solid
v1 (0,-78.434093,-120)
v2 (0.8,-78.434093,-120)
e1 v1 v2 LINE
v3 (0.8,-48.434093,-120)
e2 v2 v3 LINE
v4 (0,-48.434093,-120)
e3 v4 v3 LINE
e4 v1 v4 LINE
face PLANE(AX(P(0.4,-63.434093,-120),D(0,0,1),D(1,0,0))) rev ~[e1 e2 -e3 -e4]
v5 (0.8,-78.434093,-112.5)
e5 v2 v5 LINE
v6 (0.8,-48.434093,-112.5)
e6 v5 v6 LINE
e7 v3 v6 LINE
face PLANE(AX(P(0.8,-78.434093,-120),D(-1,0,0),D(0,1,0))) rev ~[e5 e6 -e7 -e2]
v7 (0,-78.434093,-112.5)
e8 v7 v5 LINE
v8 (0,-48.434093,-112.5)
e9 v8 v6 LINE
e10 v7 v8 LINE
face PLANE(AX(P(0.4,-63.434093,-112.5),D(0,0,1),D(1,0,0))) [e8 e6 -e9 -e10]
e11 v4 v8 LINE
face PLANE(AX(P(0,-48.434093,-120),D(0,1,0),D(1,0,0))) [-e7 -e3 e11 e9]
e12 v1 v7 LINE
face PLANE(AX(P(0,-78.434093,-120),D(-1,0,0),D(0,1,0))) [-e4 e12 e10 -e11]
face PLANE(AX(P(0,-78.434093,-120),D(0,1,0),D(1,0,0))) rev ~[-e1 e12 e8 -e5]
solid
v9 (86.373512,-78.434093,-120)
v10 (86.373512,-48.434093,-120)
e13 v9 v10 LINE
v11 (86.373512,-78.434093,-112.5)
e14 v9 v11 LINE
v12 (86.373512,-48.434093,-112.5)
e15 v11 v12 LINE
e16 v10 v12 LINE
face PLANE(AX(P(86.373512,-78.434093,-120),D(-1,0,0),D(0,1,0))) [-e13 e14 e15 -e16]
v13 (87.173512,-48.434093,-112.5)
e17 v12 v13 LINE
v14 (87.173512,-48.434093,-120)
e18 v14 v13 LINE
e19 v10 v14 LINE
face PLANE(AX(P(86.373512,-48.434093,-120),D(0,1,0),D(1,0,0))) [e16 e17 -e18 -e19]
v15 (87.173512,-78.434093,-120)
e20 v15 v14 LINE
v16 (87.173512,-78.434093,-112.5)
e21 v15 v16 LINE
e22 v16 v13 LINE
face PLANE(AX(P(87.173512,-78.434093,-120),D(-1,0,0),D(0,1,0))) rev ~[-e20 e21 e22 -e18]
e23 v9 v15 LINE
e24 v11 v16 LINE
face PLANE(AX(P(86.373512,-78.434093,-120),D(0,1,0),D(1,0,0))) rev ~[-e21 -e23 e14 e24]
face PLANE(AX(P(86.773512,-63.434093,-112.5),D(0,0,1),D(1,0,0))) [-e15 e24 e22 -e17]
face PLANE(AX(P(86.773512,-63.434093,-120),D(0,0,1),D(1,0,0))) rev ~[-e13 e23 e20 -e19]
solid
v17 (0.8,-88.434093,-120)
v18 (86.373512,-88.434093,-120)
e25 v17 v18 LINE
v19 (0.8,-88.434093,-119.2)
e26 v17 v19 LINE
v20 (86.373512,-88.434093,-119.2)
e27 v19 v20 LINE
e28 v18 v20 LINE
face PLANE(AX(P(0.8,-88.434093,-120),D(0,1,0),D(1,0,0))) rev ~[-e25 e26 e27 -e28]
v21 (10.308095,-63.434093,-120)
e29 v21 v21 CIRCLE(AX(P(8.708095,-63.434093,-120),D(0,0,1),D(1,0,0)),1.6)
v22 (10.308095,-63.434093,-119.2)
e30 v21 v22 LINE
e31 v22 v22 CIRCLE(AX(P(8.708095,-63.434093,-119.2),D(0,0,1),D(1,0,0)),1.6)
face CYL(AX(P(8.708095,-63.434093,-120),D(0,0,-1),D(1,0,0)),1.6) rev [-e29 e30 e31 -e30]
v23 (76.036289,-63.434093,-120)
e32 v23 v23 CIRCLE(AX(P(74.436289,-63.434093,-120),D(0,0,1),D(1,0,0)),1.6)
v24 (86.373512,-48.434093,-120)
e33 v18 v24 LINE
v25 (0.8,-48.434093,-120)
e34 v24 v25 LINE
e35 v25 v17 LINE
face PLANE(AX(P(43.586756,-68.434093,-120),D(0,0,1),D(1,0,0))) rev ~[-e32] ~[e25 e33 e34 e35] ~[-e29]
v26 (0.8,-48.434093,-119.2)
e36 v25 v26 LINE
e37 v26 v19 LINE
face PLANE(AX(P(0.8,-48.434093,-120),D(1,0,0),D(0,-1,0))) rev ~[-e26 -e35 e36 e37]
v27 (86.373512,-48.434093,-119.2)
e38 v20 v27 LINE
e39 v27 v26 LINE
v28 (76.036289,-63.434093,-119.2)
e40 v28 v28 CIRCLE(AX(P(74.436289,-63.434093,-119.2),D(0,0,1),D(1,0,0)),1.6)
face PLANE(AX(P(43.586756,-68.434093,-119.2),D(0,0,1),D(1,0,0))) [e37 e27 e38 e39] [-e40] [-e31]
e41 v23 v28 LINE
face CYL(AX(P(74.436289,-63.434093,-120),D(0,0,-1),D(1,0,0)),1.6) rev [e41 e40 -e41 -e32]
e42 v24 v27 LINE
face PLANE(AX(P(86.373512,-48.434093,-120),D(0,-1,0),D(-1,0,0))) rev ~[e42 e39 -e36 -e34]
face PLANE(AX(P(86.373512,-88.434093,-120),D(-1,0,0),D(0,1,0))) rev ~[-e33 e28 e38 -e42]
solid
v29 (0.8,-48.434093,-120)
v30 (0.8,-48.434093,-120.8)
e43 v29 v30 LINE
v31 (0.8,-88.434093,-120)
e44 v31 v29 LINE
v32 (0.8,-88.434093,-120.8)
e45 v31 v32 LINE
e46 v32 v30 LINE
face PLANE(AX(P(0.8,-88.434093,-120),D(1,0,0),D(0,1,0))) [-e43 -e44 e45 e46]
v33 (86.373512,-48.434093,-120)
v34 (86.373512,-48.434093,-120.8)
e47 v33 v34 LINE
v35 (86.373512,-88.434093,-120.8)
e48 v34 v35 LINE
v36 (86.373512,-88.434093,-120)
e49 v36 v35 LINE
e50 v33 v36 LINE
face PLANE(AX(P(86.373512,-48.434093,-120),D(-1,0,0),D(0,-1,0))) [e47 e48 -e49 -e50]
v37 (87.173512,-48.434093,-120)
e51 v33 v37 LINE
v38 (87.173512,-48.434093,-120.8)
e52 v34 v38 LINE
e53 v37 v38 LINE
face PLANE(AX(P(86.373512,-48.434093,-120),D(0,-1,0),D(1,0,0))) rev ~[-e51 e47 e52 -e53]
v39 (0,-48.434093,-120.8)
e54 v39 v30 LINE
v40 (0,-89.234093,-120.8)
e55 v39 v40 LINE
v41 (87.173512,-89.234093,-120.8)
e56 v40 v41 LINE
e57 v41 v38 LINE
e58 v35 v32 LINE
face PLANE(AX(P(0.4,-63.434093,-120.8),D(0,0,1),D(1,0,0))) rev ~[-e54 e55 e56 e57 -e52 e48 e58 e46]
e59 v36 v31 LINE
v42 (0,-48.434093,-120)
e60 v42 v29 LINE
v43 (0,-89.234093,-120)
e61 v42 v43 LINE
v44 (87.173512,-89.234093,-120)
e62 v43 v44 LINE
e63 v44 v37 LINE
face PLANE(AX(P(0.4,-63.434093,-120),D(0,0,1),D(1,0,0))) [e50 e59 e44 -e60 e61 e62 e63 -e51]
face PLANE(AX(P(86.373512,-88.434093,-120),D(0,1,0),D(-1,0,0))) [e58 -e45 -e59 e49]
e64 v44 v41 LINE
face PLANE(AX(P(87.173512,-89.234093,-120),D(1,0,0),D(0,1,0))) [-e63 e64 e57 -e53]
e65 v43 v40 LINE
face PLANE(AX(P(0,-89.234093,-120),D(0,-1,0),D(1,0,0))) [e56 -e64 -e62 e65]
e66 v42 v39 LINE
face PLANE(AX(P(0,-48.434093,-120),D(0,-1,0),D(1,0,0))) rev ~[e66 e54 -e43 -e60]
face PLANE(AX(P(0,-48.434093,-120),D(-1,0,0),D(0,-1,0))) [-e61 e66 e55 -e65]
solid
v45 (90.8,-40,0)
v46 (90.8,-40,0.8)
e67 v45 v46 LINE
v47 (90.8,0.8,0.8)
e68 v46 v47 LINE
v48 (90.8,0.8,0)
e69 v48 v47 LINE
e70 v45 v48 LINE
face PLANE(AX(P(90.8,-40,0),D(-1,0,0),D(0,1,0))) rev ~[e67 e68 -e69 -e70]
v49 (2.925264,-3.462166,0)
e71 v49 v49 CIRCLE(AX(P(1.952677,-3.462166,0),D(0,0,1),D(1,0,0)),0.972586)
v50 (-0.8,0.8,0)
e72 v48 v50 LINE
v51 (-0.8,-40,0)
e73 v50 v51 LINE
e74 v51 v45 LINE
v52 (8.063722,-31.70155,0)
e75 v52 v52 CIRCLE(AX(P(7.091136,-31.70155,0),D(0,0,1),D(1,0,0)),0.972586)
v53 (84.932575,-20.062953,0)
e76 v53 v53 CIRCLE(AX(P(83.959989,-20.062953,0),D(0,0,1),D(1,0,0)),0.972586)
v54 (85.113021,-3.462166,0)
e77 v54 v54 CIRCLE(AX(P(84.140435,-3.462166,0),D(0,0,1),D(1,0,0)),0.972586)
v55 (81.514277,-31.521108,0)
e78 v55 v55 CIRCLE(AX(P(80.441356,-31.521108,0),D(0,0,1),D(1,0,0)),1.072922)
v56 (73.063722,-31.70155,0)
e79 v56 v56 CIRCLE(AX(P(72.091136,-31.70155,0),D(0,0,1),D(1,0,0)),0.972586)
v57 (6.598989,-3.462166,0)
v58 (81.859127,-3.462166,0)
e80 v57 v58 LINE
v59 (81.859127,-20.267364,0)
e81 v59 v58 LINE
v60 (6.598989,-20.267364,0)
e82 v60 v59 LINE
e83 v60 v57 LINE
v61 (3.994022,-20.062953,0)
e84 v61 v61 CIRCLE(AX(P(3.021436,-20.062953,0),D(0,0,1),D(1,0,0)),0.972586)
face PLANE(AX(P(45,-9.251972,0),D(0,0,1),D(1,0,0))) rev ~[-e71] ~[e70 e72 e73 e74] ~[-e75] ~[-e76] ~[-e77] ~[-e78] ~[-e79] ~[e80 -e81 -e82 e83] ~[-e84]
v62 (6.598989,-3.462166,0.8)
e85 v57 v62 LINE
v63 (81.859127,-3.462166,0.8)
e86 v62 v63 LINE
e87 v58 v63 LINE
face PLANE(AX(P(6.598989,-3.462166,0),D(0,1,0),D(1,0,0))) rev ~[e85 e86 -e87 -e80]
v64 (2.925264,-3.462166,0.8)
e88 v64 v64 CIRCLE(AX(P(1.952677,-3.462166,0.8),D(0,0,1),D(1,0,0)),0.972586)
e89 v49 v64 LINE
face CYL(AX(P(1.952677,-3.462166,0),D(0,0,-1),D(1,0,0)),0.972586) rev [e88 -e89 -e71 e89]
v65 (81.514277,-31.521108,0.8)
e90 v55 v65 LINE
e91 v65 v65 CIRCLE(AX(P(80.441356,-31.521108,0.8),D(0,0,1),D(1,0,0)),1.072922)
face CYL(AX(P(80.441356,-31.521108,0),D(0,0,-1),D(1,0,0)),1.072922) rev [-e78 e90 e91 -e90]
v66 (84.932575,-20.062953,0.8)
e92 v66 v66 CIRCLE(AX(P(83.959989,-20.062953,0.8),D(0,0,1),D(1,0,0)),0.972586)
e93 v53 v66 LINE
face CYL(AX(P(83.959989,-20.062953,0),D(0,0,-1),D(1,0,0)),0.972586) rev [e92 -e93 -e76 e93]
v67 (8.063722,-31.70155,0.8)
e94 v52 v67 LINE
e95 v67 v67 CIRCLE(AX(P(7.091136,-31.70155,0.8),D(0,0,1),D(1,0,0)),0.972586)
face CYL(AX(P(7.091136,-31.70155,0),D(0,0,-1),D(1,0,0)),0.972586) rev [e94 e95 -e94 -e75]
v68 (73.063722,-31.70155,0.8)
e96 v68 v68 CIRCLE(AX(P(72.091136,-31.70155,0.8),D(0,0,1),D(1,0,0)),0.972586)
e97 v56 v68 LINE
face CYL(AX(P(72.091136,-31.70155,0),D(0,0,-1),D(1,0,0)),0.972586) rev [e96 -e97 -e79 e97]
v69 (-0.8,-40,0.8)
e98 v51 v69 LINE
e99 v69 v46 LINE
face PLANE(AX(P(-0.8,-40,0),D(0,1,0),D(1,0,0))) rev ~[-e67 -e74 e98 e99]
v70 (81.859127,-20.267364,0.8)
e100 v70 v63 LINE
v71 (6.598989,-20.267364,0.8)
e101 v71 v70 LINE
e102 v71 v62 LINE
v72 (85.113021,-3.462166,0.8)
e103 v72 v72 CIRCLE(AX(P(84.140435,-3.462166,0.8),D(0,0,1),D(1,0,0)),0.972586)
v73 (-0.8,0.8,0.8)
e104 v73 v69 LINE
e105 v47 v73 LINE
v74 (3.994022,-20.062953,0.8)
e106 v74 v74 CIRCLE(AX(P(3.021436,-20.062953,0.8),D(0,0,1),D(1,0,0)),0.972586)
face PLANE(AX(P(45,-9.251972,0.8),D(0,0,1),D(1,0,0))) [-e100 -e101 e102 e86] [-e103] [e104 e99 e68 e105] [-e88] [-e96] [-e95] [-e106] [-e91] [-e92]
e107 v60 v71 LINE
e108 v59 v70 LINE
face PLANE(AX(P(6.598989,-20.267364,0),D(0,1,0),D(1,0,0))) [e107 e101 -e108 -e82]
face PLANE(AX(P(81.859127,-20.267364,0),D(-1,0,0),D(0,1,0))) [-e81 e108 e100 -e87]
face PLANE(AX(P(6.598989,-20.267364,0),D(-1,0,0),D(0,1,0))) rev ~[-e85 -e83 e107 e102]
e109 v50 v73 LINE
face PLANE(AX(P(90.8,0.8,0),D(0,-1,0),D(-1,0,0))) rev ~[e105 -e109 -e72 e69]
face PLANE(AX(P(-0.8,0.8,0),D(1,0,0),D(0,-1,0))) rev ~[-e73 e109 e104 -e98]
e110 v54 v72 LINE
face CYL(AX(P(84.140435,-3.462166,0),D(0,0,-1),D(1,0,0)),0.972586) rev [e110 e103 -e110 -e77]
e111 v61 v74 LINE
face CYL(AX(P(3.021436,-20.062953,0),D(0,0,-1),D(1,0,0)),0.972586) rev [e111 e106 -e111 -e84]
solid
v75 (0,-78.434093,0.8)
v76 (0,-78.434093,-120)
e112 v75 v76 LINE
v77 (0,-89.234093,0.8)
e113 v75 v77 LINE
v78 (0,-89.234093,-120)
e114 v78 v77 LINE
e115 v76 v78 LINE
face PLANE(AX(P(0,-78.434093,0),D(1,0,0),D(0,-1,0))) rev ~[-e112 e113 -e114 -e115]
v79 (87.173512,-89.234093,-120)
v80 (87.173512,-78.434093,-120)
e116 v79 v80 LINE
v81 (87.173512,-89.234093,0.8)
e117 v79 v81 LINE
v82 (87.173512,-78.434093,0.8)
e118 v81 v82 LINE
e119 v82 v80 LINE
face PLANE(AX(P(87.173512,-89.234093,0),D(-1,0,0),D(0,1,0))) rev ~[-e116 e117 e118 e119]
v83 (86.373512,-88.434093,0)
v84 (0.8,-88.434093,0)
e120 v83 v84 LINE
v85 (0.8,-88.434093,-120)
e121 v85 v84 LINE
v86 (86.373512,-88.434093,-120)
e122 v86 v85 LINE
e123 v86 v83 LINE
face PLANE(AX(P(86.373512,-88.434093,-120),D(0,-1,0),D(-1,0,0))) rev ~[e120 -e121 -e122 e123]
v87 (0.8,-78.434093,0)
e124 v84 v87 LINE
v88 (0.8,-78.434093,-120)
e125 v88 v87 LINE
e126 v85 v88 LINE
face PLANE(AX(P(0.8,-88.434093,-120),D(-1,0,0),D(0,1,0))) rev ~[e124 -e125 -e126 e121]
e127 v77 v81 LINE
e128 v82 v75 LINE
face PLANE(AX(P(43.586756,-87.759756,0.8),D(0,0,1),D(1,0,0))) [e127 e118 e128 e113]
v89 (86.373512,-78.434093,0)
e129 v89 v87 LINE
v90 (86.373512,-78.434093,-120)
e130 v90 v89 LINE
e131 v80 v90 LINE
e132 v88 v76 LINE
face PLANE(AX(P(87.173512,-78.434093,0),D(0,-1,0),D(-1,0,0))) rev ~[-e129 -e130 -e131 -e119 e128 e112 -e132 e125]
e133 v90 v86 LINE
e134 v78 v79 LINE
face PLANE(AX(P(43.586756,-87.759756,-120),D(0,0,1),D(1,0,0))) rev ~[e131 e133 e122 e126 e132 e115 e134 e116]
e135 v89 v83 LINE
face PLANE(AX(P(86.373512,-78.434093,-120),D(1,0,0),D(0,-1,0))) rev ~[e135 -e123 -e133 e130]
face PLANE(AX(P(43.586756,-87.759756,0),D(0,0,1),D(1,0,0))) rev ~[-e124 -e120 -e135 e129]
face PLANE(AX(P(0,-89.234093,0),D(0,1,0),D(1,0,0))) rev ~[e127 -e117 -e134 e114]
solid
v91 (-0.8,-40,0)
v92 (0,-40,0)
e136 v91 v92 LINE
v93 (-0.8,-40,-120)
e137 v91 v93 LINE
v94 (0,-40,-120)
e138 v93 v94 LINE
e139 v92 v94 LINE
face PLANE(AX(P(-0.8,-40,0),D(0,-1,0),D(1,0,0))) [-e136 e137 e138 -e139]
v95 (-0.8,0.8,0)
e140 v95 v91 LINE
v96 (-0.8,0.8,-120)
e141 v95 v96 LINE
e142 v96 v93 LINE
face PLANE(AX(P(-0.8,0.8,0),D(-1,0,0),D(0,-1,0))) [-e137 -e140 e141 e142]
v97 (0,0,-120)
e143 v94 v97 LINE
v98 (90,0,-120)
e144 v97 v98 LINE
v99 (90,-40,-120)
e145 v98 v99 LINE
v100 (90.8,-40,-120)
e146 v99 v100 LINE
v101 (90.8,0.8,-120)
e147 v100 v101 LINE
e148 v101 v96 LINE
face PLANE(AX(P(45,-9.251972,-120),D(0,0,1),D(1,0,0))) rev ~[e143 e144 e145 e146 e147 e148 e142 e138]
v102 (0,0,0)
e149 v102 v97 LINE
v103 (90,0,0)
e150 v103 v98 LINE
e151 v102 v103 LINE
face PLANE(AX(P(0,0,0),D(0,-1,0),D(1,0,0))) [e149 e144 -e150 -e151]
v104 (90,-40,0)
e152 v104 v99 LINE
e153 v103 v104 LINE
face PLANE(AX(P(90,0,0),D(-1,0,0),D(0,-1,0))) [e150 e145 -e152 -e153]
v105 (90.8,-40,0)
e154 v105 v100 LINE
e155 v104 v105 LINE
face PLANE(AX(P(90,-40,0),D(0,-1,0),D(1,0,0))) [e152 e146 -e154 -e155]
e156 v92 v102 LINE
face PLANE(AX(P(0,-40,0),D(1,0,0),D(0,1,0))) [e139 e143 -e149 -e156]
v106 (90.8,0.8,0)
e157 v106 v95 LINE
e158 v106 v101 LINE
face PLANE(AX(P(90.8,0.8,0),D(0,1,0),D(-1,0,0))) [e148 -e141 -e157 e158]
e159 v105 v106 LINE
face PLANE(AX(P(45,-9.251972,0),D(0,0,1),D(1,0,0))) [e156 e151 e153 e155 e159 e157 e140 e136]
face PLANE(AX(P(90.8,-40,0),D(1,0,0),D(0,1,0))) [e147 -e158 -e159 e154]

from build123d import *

# Parameters (mm, degrees)
F1_DEPTH  = 120
F0_W      = 90
F0_H      = 40
F0_R      = 0.9725861443
F0_R_2    = 1.0729216039
F0_W_2    = 75.2601372078
F0_H_2    = 16.8051975779
F2_DEPTH  = 0.8
F4_W      = 0.8
F4_H      = 30
F5_DEPTH  = 0.8
F6_DEPTH  = 120
F7_DEPTH  = 7.5
F8_W      = 85.5735123101
F8_H      = 10
F9_DEPTH  = 0.8
F4_R      = 1.6
F10_DEPTH = 0.8


with BuildPart() as f1:
    # F0 (on Top) → F1 (new body)
    with BuildSketch(Plane.XY):
        Polygon((0, -40), (0, 0), (90, 0), (90, -40), (90.8, -40), (90.8, 0.8), (-0.8, 0.8), (-0.8, -40), align=None)
    extrude(amount=-F1_DEPTH)


with BuildPart() as f2:
    # F0 (on Top) → F2 (new body)
    with BuildSketch(Plane.XY):
        Polygon((0, -40), (0, 0), (90, 0), (90, -40), (90.8, -40), (90.8, 0.8), (-0.8, 0.8), (-0.8, -40), align=None)
        with Locations((45, -20)):
            Rectangle(F0_W, F0_H)
        with Locations((7.0911361836, -31.7015498877)):
            Circle(F0_R, mode=Mode.SUBTRACT)
        with Locations((3.0214360449, -20.0629532337)):
            Circle(F0_R, mode=Mode.SUBTRACT)
        with Locations((72.0911361836, -31.7015498877)):
            Circle(F0_R, mode=Mode.SUBTRACT)
        with Locations((80.4413557053, -31.5211080015)):
            Circle(F0_R_2, mode=Mode.SUBTRACT)
        with Locations((83.9599892497, -20.0629532337)):
            Circle(F0_R, mode=Mode.SUBTRACT)
        with Locations((44.2290580831, -11.8647648487)):
            Rectangle(F0_W_2, F0_H_2, mode=Mode.SUBTRACT)
        with Locations((1.9526774995, -3.4621660598)):
            Circle(F0_R, mode=Mode.SUBTRACT)
        with Locations((84.1404348612, -3.4621660598)):
            Circle(F0_R, mode=Mode.SUBTRACT)
    extrude(amount=F2_DEPTH)


with BuildPart() as f5:
    # F4 (on offset) → F5 (new body)
    with BuildSketch(Plane.XY.offset(-120)):
        with Locations((0.4, -63.4340933131)):
            Rectangle(F4_W, F4_H)
        Polygon((0.8, -78.4340933131), (0, -78.4340933131), (0, -89.2340933131), (87.1735123101, -89.2340933131), (87.1735123101, -78.4340933131), (86.3735123101, -78.4340933131), (86.3735123101, -88.4340933131), (0.8, -88.4340933131), align=None)
        with Locations((86.7735123101, -63.4340933131)):
            Rectangle(F4_W, F4_H)
    extrude(amount=-F5_DEPTH)


with BuildPart() as f6:
    # F4 (on offset) → F6 (new body)
    with BuildSketch(Plane.XY.offset(-120)):
        Polygon((0.8, -78.4340933131), (0, -78.4340933131), (0, -89.2340933131), (87.1735123101, -89.2340933131), (87.1735123101, -78.4340933131), (86.3735123101, -78.4340933131), (86.3735123101, -88.4340933131), (0.8, -88.4340933131), align=None)
    extrude(amount=F6_DEPTH)

    # F8 (on face) → F9 (join)
    with BuildSketch(Plane.XY):
        Polygon((0, -78.4340933131), (0, -89.2340933131), (87.1735123101, -89.2340933131), (87.1735123101, -78.4340933131), (86.3735123101, -78.4340933131), (86.3735123101, -88.4340933131), (0.8, -88.4340933131), (0.8, -78.4340933131), align=None)
        with Locations((43.586756155, -83.4340933131)):
            Rectangle(F8_W, F8_H)
    extrude(amount=F9_DEPTH)


with BuildPart() as f7:
    # F4 (on offset) → F7 (new body)
    with BuildSketch(Plane.XY.offset(-120)):
        with Locations((86.7735123101, -63.4340933131)):
            Rectangle(F4_W, F4_H)
    extrude(amount=F7_DEPTH)


with BuildPart() as f7b:
    # F4 (on offset) → F7, piece 2 (new body)
    with BuildSketch(Plane.XY.offset(-120)):
        with Locations((0.4, -63.4340933131)):
            Rectangle(F4_W, F4_H)
    extrude(amount=F7_DEPTH)


with BuildPart() as f10:
    # F4 (on offset) → F10 (new body)
    with BuildSketch(Plane.XY.offset(-120)):
        Polygon((86.3735123101, -48.4340933131), (0.8, -48.4340933131), (0.8, -78.4340933131), (0.8, -88.4340933131), (86.3735123101, -88.4340933131), (86.3735123101, -78.4340933131), align=None)
        with Locations((8.708095178, -63.4340933131)):
            Circle(F4_R, mode=Mode.SUBTRACT)
        with Locations((74.4362887124, -63.4340933131)):
            Circle(F4_R, mode=Mode.SUBTRACT)
    extrude(amount=F10_DEPTH)


solid = Compound([f1.part, f2.part, f5.part, f6.part, f7.part, f7b.part, f10.part])
